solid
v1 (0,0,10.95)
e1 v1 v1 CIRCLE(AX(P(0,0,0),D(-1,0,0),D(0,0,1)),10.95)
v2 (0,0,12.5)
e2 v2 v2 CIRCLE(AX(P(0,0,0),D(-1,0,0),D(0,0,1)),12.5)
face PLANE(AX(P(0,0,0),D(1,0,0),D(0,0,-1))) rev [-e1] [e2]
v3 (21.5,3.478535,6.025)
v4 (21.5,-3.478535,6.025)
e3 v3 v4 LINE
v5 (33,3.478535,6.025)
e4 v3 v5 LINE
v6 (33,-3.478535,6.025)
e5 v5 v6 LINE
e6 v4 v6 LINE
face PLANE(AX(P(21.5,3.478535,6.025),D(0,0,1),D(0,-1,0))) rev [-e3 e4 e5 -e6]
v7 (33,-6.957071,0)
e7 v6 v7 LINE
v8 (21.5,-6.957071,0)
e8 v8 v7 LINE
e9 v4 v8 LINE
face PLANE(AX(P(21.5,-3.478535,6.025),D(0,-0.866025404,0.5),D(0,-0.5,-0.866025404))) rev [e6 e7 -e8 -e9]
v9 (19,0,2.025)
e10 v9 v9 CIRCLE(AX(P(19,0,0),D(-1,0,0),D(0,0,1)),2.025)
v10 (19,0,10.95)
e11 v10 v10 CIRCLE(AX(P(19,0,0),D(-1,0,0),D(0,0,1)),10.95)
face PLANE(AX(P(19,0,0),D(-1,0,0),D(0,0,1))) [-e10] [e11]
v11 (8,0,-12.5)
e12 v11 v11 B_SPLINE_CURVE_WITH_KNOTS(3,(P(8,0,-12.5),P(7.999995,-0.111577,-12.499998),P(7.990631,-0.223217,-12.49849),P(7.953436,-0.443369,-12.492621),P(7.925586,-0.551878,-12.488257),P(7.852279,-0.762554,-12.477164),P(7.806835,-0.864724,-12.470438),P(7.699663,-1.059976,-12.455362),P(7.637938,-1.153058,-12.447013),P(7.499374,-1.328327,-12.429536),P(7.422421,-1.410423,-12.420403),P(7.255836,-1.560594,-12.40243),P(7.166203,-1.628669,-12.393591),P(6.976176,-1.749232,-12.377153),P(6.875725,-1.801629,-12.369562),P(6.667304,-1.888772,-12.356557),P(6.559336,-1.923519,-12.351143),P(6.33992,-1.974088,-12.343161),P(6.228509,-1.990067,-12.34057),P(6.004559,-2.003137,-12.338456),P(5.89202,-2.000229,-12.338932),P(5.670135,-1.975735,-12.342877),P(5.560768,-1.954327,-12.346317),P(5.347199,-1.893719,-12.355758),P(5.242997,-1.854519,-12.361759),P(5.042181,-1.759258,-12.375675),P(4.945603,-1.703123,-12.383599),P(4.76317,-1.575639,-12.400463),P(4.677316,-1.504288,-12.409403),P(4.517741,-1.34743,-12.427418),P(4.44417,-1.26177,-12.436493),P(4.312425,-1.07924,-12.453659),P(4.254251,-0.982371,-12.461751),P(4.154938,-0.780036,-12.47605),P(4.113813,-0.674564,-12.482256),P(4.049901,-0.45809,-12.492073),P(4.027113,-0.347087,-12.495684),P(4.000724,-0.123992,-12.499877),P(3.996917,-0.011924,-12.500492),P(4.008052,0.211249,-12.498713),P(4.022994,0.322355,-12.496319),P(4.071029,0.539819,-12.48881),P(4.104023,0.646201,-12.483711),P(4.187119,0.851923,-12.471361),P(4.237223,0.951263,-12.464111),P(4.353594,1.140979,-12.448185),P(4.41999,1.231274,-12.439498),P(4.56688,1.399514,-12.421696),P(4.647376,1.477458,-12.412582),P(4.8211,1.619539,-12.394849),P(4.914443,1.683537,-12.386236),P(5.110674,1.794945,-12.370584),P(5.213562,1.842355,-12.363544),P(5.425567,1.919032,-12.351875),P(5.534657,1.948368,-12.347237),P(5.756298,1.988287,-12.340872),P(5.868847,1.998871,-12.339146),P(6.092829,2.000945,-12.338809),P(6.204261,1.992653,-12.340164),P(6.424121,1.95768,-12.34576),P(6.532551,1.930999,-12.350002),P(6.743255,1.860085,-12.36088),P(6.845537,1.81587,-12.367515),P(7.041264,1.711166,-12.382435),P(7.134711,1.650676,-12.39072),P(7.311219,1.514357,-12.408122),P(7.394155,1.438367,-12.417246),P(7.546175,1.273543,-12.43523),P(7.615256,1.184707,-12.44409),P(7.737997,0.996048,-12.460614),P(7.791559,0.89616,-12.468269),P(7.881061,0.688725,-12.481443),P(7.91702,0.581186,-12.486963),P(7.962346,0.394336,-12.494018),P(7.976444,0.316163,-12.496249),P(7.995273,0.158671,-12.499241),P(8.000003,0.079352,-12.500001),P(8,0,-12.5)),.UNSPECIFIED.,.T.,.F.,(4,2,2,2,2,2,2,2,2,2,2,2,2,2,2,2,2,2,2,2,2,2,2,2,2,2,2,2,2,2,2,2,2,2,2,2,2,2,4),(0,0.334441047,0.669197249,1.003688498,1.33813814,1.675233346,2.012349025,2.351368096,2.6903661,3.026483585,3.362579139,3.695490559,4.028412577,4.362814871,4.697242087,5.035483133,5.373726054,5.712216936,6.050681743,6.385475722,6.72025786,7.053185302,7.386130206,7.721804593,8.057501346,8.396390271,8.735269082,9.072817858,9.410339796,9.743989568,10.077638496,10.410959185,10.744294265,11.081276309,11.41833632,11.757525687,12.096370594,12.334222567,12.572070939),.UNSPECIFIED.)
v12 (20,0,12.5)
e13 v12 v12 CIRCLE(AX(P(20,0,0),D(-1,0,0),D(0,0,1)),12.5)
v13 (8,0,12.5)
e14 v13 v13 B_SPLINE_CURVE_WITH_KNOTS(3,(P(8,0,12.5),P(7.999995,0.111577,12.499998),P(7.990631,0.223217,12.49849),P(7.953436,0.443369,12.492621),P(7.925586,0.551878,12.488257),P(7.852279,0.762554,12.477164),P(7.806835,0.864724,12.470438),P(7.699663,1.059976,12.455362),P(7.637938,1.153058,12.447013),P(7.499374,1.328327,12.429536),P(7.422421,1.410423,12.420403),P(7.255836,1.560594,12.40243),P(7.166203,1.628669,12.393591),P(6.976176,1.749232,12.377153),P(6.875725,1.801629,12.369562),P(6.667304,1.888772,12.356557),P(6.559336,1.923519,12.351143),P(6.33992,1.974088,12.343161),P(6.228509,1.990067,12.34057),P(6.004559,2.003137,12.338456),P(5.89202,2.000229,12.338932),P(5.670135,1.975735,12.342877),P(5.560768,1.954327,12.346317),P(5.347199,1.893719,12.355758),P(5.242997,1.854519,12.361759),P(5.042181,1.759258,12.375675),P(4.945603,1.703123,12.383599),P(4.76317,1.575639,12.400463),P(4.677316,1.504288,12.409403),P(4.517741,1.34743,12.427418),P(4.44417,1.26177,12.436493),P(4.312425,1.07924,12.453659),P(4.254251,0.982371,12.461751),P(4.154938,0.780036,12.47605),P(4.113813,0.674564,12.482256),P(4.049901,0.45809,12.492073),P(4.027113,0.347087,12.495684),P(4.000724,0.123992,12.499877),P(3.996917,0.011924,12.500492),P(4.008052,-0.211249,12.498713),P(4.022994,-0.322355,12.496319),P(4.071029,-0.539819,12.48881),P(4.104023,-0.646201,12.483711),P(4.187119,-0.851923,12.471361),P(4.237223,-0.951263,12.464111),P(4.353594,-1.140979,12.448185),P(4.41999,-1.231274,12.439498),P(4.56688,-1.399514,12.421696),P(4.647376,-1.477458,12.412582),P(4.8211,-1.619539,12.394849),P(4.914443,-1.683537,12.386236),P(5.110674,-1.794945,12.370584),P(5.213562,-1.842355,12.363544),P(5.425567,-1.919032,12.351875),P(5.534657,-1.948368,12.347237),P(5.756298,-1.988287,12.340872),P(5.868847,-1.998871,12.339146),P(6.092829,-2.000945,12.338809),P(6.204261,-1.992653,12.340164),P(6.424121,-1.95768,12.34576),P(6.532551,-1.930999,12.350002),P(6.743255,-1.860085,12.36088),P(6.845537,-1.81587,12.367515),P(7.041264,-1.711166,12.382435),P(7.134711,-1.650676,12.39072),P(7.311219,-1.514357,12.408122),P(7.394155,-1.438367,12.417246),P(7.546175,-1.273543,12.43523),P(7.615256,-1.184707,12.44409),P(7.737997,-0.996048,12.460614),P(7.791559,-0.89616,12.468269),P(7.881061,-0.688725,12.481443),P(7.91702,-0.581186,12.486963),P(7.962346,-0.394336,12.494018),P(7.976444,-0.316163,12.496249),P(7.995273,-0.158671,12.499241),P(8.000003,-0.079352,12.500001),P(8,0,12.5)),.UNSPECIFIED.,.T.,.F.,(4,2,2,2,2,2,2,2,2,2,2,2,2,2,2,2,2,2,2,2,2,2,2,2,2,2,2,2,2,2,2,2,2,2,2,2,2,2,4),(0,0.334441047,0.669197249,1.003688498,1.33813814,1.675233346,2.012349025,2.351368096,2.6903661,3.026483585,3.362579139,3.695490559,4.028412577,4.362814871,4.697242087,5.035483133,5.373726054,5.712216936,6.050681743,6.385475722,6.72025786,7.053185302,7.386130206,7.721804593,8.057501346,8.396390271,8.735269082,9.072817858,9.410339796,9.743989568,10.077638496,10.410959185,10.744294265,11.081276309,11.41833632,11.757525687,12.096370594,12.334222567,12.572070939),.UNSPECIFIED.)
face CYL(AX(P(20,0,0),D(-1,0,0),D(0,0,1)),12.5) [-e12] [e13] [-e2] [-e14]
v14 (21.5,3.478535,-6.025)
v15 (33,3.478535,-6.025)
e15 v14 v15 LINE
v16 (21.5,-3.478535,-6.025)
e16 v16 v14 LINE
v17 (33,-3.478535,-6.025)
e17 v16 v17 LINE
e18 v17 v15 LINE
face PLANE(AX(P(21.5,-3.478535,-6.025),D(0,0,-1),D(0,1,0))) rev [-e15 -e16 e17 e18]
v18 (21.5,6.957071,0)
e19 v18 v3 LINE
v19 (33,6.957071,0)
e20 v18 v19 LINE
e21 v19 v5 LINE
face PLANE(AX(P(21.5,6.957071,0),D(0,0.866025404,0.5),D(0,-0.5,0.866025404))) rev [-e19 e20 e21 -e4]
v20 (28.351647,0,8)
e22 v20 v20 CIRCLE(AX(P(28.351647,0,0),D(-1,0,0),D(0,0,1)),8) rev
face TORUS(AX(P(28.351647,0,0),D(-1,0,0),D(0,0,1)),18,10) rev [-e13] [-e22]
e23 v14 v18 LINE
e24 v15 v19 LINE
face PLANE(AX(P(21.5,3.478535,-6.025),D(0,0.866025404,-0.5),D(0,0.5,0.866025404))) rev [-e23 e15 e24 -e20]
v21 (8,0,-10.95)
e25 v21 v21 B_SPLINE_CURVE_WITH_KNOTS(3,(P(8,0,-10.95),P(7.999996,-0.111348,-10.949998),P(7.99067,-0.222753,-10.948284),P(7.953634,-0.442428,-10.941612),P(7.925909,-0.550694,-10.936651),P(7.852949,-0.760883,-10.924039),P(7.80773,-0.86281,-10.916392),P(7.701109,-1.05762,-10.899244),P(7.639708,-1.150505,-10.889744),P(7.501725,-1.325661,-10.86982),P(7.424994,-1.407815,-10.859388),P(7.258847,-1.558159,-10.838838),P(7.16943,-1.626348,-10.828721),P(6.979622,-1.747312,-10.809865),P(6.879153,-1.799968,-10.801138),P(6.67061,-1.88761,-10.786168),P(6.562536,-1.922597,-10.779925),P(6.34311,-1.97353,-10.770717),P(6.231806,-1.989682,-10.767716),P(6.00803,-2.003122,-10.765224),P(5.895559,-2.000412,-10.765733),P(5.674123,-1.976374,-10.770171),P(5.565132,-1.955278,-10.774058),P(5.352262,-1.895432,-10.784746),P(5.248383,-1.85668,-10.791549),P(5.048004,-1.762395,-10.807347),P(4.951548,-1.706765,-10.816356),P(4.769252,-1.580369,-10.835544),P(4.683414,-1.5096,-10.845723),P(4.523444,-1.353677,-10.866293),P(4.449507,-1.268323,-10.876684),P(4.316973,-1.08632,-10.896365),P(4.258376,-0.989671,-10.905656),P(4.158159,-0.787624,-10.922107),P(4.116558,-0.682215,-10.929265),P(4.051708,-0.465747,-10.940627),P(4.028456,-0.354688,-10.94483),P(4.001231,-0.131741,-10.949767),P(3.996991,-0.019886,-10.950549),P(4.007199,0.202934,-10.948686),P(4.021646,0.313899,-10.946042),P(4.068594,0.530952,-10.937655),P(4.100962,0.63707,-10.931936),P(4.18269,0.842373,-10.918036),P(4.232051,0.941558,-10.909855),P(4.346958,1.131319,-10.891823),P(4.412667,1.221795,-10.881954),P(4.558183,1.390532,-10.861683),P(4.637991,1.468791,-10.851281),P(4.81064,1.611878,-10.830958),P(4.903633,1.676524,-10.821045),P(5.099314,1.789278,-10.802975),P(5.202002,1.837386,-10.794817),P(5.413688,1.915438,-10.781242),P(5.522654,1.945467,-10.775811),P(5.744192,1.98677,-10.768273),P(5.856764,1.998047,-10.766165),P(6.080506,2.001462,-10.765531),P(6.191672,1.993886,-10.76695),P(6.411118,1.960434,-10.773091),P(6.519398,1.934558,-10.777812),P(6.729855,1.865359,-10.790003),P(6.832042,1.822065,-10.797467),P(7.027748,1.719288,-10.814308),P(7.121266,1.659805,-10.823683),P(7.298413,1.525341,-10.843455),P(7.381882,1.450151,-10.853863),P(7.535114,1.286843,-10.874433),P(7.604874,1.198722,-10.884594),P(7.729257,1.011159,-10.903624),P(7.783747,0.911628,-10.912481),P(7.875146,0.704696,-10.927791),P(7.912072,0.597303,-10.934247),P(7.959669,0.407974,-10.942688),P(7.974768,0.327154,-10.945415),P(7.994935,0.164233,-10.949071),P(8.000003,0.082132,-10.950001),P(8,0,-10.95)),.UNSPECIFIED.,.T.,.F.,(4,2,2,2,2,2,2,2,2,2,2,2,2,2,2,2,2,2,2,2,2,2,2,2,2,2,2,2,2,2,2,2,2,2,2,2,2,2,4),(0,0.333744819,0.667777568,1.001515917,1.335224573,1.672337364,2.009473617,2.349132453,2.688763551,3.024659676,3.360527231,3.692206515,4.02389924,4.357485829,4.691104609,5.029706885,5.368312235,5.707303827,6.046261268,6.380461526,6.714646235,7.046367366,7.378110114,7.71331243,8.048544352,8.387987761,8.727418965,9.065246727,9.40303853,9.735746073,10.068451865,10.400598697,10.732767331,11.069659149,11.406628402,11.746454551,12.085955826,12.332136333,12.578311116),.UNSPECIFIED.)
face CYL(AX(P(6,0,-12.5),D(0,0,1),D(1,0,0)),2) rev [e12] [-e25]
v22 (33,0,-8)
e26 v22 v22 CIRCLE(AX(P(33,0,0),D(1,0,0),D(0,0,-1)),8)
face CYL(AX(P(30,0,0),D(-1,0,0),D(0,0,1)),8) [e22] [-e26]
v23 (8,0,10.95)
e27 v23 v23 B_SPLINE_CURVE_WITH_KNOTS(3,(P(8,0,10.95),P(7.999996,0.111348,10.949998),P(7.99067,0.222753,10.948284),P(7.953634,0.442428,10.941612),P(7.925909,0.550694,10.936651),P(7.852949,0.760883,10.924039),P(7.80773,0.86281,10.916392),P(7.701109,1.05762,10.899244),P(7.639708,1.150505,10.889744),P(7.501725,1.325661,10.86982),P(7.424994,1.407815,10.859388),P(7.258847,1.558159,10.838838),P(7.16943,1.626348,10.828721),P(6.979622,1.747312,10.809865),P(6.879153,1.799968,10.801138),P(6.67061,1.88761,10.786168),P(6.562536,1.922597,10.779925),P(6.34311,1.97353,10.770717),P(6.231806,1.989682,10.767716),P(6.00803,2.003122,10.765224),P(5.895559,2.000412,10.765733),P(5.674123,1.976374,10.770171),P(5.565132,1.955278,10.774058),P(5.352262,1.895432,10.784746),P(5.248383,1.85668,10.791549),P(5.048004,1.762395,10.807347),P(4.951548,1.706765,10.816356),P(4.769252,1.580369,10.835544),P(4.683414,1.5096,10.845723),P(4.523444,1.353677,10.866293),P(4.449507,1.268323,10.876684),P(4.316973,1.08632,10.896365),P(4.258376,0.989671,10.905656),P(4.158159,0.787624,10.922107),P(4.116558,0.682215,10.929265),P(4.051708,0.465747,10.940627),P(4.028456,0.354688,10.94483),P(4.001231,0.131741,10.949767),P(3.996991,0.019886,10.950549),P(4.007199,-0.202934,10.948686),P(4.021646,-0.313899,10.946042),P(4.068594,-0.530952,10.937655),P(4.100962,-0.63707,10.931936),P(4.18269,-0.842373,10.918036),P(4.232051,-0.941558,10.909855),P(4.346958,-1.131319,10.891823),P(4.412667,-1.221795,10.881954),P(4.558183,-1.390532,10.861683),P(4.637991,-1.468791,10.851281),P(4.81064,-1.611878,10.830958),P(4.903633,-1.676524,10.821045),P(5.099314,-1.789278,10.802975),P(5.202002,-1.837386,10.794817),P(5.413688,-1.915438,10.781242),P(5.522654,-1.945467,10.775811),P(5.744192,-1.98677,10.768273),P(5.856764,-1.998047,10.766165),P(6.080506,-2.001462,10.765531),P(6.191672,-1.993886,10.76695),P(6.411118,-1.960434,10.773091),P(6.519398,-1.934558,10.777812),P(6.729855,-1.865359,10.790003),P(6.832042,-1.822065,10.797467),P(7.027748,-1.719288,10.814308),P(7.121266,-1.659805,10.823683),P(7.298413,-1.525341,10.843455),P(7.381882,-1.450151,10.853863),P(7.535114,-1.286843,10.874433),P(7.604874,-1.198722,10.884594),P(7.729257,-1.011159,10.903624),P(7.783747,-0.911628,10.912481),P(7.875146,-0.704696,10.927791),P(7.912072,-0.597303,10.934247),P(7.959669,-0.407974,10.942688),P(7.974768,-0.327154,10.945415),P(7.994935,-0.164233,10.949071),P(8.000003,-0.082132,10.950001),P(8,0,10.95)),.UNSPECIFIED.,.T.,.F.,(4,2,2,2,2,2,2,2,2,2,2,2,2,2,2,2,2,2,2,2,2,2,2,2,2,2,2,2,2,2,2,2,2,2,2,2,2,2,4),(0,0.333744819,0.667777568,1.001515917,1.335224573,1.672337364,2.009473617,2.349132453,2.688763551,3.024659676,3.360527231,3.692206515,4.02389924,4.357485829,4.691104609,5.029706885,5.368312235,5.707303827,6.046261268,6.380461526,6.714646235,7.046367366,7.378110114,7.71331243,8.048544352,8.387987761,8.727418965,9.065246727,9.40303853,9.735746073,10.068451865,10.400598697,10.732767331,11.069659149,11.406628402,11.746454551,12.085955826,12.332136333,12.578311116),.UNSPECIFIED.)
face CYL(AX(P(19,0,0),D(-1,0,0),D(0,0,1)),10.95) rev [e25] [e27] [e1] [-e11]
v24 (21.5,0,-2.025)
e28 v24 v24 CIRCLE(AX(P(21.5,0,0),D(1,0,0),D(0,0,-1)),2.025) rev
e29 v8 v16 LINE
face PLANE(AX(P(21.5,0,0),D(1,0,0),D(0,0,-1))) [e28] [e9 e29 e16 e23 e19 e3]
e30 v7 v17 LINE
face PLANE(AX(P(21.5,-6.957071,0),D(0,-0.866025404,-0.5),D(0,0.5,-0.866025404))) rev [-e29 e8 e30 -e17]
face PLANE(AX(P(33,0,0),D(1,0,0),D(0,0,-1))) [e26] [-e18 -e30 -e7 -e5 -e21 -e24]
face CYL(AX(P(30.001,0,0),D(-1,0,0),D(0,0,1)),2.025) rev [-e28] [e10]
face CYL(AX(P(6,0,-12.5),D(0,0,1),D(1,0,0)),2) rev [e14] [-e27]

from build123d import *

# Parameters (mm, degrees)
CROQUIS1_R                 = 8
SALIENTE_EXTRUIR1_DEPTH    = 30
CORTAR_EXTRUIR1_DEPTH      = 8.5
CROQUIS9_R                 = 12.5
SALIENTE_EXTRUIR5_DEPTH    = 20
CROQUIS3_R                 = 10.95
CORTAR_EXTRUIR2_DEPTH      = 19
CORTAR_EXTRUIR3_REACH      = 27.952
CROQUIS4_R                 = 2.025
CORTAR_EXTRUIR4_DEPTH      = 35.820970693
CORTAR_EXTRUIR4_DEPTH_BACK = 35.820970693
CROQUIS5_R                 = 2
CROQUIS7_R                 = 8
SALIENTE_EXTRUIR3_DEPTH    = 3
REDONDEO1_R                = 10


with BuildPart() as part:
    # Croquis1 → Saliente-Extruir1 (new body)
    with BuildSketch(Plane(origin=(0, 0, 0), x_dir=(0, 0, -1), z_dir=(1, 0, 0))):
        Circle(CROQUIS1_R)
    extrude(amount=SALIENTE_EXTRUIR1_DEPTH)

    # Croquis2 → Cortar-Extruir1 (cut)
    with BuildSketch(Plane(origin=(30, 0, 0), x_dir=(0, 0, -1), z_dir=(1, 0, 0))):
        Polygon((0, -6.957070744), (6.025, -3.478535372), (6.025, 3.478535372), (0, 6.957070744), (-6.025, 3.478535372), (-6.025, -3.478535372), align=None)
    extrude(amount=-CORTAR_EXTRUIR1_DEPTH, mode=Mode.SUBTRACT)

    # Croquis9 → Saliente-Extruir5 (add)
    with BuildSketch(Plane.ZY):
        Circle(CROQUIS9_R)
    extrude(amount=-SALIENTE_EXTRUIR5_DEPTH)

    # Croquis3 → Cortar-Extruir2 (cut)
    with BuildSketch(Plane.ZY):
        Circle(CROQUIS3_R)
    extrude(amount=-CORTAR_EXTRUIR2_DEPTH, mode=Mode.SUBTRACT)

    # Croquis4 → Cortar-Extruir3 (cut, up to next)
    with BuildSketch(Plane.ZY.offset(-19), mode=Mode.PRIVATE) as cortar_extruir3_sk1:
        Circle(CROQUIS4_R)
    cortar_extruir3_tool1 = extrude(cortar_extruir3_sk1.sketch, amount=-CORTAR_EXTRUIR3_REACH, mode=Mode.PRIVATE) & part.part
    add(cortar_extruir3_tool1.solids().sort_by_distance((19, 0, 0))[0], mode=Mode.SUBTRACT)

    # Croquis5 → Cortar-Extruir4 (cut, two sides: drawn at the far end of the back side and taken through both)
    with BuildSketch(Plane.XY.offset(-CORTAR_EXTRUIR4_DEPTH_BACK)):
        with Locations((6, 0)):
            Circle(CROQUIS5_R)
    extrude(amount=CORTAR_EXTRUIR4_DEPTH + CORTAR_EXTRUIR4_DEPTH_BACK, mode=Mode.SUBTRACT)

    # Croquis7 → Saliente-Extruir3 (add)
    with BuildSketch(Plane(origin=(30, 0, 0), x_dir=(0, 0, -1), z_dir=(1, 0, 0))):
        with Locations(Location((0, 0, 0), (0, 0, 180))):
            Circle(CROQUIS7_R)
        Polygon((-6.025, -3.478535372), (0, -6.957070744), (6.025, -3.478535372), (6.025, 3.478535372), (0, 6.957070744), (-6.025, 3.478535372), align=None, mode=Mode.SUBTRACT)
    extrude(amount=SALIENTE_EXTRUIR3_DEPTH)

    # Redondeo1
    # the kernel refuses this fillet: 10 mm, written as the material it adds along each edge
    with BuildSketch(Plane(origin=(20, 0, 0), x_dir=(0, 0, -1), z_dir=(0, 1, 0))) as redondeo1_piece_1:
        with BuildLine():
            CenterArc((18, -8.351646544), REDONDEO1_R, 123.367012969, 56.632987031)
            Line((12.5, 0), (12.39, 0.167032931))
            ThreePointArc((12.39, 0.167032931), (10.25, 0.2), (8, 0.2))
            Line((8, 0.2), (7.8, 0))
            Line((7.8, 0), (7.8, -8.351646544))
            Line((7.8, -8.351646544), (8, -8.351646544))
        make_face()
    revolve(axis=Axis((20, 0, 0), (-1, 0, 0)))


solid = part.part
